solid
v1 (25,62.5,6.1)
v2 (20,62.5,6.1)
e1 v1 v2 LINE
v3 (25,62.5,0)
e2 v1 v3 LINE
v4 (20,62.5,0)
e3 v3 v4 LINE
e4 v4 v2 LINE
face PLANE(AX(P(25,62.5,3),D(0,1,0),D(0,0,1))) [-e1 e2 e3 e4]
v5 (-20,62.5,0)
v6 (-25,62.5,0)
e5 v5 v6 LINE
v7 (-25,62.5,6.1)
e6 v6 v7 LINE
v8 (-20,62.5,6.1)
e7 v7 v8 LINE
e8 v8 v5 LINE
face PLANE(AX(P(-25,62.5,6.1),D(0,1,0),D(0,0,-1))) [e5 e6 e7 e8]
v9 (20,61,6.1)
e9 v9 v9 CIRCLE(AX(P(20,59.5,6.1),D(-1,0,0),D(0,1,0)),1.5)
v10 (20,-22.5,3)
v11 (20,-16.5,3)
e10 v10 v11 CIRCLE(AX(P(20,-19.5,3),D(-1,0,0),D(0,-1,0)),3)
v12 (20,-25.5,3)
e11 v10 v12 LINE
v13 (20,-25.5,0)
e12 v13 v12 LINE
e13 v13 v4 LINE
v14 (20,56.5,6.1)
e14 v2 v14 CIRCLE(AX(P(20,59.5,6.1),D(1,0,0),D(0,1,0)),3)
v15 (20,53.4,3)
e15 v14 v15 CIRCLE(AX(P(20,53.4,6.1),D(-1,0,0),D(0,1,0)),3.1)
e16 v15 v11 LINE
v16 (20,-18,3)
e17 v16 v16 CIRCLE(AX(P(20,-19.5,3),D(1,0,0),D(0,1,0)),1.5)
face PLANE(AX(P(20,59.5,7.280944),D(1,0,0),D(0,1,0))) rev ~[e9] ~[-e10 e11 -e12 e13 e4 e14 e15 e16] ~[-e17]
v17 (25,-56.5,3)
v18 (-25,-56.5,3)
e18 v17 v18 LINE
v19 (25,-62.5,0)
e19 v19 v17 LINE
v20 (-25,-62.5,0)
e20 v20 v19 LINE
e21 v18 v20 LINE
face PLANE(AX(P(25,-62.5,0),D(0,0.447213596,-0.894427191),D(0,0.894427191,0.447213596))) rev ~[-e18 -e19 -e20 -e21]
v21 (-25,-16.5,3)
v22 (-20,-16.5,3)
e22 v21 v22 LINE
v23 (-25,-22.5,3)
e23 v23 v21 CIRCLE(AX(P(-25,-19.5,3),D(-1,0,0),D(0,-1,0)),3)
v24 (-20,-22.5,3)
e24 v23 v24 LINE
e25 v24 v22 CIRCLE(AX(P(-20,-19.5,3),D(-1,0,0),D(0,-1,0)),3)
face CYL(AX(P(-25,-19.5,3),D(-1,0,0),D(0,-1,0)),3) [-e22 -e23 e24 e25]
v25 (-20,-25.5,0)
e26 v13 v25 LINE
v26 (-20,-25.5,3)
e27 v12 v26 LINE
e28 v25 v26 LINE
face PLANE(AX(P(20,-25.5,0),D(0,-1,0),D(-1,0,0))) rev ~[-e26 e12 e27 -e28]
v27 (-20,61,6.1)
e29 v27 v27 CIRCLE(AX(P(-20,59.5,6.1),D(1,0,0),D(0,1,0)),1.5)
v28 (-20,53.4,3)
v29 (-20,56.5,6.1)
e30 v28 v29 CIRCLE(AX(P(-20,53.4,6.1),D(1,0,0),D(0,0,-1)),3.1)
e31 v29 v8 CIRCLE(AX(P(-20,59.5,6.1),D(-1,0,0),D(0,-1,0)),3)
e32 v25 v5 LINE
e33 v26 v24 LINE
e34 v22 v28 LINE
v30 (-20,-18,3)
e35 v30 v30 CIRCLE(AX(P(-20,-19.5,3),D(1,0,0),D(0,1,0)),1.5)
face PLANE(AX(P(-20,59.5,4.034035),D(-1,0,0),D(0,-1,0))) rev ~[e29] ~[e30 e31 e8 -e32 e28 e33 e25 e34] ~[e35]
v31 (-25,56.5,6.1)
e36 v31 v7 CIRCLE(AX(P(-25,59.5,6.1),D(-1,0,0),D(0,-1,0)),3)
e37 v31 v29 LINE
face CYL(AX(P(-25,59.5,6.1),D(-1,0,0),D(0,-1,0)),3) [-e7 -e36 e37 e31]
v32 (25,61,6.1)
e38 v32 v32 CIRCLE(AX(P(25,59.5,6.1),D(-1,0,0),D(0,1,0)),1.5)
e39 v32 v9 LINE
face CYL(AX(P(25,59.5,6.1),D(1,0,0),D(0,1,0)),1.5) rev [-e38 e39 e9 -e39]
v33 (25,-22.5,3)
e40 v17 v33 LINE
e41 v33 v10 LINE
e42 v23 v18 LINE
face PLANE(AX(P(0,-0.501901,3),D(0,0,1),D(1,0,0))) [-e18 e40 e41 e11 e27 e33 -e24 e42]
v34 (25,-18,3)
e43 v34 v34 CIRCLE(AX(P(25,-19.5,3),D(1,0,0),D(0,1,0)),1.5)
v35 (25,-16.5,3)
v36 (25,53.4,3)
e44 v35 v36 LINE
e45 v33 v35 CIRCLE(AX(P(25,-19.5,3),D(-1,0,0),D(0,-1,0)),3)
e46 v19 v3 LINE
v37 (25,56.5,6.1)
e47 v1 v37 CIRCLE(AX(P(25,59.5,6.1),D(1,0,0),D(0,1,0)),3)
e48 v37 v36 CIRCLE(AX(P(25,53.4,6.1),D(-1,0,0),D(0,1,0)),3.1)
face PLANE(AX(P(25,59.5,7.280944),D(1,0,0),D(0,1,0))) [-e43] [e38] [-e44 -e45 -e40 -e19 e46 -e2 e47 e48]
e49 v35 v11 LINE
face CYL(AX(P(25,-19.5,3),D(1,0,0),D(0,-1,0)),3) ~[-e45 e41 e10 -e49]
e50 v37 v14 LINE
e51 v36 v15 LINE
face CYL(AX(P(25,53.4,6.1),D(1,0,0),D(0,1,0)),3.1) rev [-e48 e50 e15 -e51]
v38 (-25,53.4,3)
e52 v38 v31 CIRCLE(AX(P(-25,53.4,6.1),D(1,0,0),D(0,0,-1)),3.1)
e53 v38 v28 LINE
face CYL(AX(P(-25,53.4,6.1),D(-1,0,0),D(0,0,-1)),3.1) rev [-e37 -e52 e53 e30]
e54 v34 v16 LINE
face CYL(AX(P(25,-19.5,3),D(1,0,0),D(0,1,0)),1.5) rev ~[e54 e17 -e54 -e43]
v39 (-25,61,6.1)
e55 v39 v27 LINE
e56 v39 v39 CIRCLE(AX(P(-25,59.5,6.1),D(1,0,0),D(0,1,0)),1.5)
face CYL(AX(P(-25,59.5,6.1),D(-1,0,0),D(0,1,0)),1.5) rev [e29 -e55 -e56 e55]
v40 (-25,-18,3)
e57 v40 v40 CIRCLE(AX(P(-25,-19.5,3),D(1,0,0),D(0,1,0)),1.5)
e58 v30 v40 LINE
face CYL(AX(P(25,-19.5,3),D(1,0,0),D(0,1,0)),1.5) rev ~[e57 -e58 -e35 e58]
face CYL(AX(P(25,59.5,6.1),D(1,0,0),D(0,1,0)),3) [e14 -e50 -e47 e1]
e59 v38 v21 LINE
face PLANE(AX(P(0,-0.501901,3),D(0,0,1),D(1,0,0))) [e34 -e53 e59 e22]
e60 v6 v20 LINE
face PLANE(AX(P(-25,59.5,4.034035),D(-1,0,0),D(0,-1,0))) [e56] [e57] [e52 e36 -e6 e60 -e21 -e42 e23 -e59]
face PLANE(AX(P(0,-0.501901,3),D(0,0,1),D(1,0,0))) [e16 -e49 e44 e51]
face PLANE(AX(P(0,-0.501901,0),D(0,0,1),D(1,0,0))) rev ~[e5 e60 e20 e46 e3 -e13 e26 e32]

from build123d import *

# Parameters (mm, degrees)
F1_DEPTH  = 3
F3_DEPTH  = 5
F5_DEPTH  = 5
F7_DEPTH  = 5
F9_DEPTH  = 5
F11_R     = 1.5
F12_DEPTH = 55
F14_DEPTH = 100


# Not quite as in the source:
# - a pattern or mirror of a feature is missing from the dataset's text; its kind, count and spacing are read off the source's solid
# - a feature names something its author has since deleted; it is built from what else it names


with BuildPart() as f1:
    # F0 (on Top) → F1 (new body)
    with BuildSketch(Plane.XY):
        Polygon((-20, 62.5), (-25, 62.5), (-25, -62.5), (25, -62.5), (25, 62.5), (20, 62.5), (20, -25.5), (-20, -25.5), align=None)
    extrude(amount=F1_DEPTH)

    # F4 (on face) → F5 (join)
    with BuildSketch(Plane(origin=(-25, 0, 0), x_dir=(0, -1, 0), z_dir=(-1, 0, 0))):
        with BuildLine():
            Line((16.5, 3), (22.5, 3))
            ThreePointArc((22.5, 3), (19.5, 6), (16.5, 3))
        make_face()
    f5 = extrude(amount=-F5_DEPTH)

    # F5_copies: F5 across plane
    add(f5.mirror(Plane(origin=(0, 0, 0), x_dir=(0, 0, 1), z_dir=(1, 0, 0))))

    # F6 (on face) → F7 (join)
    with BuildSketch(Plane(origin=(-25, 0, 0), x_dir=(0, -1, 0), z_dir=(-1, 0, 0))):
        with BuildLine():
            Line((-62.5, 6.1), (-62.5, 3))
            Line((-62.5, 3), (-56.5, 3))
            Line((-56.5, 3), (-56.5, 6.1))
            ThreePointArc((-56.5, 6.1), (-59.5, 3.1), (-62.5, 6.1))
        make_face()
        with BuildLine():
            ThreePointArc((-56.5, 6.1), (-59.5, 9.1), (-62.5, 6.1))
            Line((-62.5, 6.1), (-61, 6.1))
            ThreePointArc((-61, 6.1), (-59.5, 7.6), (-58, 6.1))
            Line((-58, 6.1), (-56.5, 6.1))
        make_face()
        with BuildLine():
            Line((-56.5, 6.1), (-56.5, 3))
            Line((-56.5, 3), (-53.4, 3))
            ThreePointArc((-53.4, 3), (-55.5920310217, 3.9079689783), (-56.5, 6.1))
        make_face()
        with BuildLine():
            Line((-61, 6.1), (-62.5, 6.1))
            ThreePointArc((-62.5, 6.1), (-59.5, 3.1), (-56.5, 6.1))
            Line((-56.5, 6.1), (-58, 6.1))
            ThreePointArc((-58, 6.1), (-59.5, 4.6), (-61, 6.1))
        make_face()
    extrude(amount=-F7_DEPTH)

    # F8 (on face) → F9 (join)
    with BuildSketch(Plane.YZ.offset(25)):
        with BuildLine():
            Line((61, 6.1), (62.5, 6.1))
            ThreePointArc((62.5, 6.1), (59.5, 9.1), (56.5, 6.1))
            Line((56.5, 6.1), (58, 6.1))
            ThreePointArc((58, 6.1), (59.5, 7.6), (61, 6.1))
        make_face()
        with BuildLine():
            Line((56.5, 3), (62.5, 3))
            Line((62.5, 3), (62.5, 6.1))
            ThreePointArc((62.5, 6.1), (59.5, 3.1), (56.5, 6.1))
            Line((56.5, 6.1), (56.5, 3))
        make_face()
        with BuildLine():
            Line((53.4, 3), (56.5, 3))
            Line((56.5, 3), (56.5, 6.1))
            ThreePointArc((56.5, 6.1), (55.5920310217, 3.9079689783), (53.4, 3))
        make_face()
        with BuildLine():
            ThreePointArc((56.5, 6.1), (59.5, 3.1), (62.5, 6.1))
            Line((62.5, 6.1), (61, 6.1))
            ThreePointArc((61, 6.1), (59.5, 4.6), (58, 6.1))
            Line((58, 6.1), (56.5, 6.1))
        make_face()
    extrude(amount=-F9_DEPTH)


with BuildPart() as f3:
    # F2 (on face) → F3 (new body)
    with BuildSketch(Plane.YZ.offset(25)):
        with BuildLine():
            ThreePointArc((-19.5000000146, 0), (-17.3786796616, 0.8786796513), (-16.5, 3))
            Line((-16.5, 3), (-22.5, 3))
            ThreePointArc((-22.5, 3), (-21.6213203487, 0.8786796616), (-19.5000000146, 0))
        make_face()
    extrude(amount=-F3_DEPTH)


with BuildPart() as f1_1:
    add(f1.part)

    # F10: union F3
    add(f3.part)

    # F11 (on face) → F12 (cut)
    with BuildSketch(Plane.YZ.offset(25)):
        with Locations((-19.5, 3)):
            Circle(F11_R)
    extrude(amount=-F12_DEPTH, mode=Mode.SUBTRACT)

    # F13 (on face) → F14 (cut)
    with BuildSketch(Plane.YZ.offset(25)):
        Polygon((-62.5, 3), (-62.5, 0), (-56.5, 3), align=None)
    extrude(amount=-F14_DEPTH, mode=Mode.SUBTRACT)


solid = f1_1.part
